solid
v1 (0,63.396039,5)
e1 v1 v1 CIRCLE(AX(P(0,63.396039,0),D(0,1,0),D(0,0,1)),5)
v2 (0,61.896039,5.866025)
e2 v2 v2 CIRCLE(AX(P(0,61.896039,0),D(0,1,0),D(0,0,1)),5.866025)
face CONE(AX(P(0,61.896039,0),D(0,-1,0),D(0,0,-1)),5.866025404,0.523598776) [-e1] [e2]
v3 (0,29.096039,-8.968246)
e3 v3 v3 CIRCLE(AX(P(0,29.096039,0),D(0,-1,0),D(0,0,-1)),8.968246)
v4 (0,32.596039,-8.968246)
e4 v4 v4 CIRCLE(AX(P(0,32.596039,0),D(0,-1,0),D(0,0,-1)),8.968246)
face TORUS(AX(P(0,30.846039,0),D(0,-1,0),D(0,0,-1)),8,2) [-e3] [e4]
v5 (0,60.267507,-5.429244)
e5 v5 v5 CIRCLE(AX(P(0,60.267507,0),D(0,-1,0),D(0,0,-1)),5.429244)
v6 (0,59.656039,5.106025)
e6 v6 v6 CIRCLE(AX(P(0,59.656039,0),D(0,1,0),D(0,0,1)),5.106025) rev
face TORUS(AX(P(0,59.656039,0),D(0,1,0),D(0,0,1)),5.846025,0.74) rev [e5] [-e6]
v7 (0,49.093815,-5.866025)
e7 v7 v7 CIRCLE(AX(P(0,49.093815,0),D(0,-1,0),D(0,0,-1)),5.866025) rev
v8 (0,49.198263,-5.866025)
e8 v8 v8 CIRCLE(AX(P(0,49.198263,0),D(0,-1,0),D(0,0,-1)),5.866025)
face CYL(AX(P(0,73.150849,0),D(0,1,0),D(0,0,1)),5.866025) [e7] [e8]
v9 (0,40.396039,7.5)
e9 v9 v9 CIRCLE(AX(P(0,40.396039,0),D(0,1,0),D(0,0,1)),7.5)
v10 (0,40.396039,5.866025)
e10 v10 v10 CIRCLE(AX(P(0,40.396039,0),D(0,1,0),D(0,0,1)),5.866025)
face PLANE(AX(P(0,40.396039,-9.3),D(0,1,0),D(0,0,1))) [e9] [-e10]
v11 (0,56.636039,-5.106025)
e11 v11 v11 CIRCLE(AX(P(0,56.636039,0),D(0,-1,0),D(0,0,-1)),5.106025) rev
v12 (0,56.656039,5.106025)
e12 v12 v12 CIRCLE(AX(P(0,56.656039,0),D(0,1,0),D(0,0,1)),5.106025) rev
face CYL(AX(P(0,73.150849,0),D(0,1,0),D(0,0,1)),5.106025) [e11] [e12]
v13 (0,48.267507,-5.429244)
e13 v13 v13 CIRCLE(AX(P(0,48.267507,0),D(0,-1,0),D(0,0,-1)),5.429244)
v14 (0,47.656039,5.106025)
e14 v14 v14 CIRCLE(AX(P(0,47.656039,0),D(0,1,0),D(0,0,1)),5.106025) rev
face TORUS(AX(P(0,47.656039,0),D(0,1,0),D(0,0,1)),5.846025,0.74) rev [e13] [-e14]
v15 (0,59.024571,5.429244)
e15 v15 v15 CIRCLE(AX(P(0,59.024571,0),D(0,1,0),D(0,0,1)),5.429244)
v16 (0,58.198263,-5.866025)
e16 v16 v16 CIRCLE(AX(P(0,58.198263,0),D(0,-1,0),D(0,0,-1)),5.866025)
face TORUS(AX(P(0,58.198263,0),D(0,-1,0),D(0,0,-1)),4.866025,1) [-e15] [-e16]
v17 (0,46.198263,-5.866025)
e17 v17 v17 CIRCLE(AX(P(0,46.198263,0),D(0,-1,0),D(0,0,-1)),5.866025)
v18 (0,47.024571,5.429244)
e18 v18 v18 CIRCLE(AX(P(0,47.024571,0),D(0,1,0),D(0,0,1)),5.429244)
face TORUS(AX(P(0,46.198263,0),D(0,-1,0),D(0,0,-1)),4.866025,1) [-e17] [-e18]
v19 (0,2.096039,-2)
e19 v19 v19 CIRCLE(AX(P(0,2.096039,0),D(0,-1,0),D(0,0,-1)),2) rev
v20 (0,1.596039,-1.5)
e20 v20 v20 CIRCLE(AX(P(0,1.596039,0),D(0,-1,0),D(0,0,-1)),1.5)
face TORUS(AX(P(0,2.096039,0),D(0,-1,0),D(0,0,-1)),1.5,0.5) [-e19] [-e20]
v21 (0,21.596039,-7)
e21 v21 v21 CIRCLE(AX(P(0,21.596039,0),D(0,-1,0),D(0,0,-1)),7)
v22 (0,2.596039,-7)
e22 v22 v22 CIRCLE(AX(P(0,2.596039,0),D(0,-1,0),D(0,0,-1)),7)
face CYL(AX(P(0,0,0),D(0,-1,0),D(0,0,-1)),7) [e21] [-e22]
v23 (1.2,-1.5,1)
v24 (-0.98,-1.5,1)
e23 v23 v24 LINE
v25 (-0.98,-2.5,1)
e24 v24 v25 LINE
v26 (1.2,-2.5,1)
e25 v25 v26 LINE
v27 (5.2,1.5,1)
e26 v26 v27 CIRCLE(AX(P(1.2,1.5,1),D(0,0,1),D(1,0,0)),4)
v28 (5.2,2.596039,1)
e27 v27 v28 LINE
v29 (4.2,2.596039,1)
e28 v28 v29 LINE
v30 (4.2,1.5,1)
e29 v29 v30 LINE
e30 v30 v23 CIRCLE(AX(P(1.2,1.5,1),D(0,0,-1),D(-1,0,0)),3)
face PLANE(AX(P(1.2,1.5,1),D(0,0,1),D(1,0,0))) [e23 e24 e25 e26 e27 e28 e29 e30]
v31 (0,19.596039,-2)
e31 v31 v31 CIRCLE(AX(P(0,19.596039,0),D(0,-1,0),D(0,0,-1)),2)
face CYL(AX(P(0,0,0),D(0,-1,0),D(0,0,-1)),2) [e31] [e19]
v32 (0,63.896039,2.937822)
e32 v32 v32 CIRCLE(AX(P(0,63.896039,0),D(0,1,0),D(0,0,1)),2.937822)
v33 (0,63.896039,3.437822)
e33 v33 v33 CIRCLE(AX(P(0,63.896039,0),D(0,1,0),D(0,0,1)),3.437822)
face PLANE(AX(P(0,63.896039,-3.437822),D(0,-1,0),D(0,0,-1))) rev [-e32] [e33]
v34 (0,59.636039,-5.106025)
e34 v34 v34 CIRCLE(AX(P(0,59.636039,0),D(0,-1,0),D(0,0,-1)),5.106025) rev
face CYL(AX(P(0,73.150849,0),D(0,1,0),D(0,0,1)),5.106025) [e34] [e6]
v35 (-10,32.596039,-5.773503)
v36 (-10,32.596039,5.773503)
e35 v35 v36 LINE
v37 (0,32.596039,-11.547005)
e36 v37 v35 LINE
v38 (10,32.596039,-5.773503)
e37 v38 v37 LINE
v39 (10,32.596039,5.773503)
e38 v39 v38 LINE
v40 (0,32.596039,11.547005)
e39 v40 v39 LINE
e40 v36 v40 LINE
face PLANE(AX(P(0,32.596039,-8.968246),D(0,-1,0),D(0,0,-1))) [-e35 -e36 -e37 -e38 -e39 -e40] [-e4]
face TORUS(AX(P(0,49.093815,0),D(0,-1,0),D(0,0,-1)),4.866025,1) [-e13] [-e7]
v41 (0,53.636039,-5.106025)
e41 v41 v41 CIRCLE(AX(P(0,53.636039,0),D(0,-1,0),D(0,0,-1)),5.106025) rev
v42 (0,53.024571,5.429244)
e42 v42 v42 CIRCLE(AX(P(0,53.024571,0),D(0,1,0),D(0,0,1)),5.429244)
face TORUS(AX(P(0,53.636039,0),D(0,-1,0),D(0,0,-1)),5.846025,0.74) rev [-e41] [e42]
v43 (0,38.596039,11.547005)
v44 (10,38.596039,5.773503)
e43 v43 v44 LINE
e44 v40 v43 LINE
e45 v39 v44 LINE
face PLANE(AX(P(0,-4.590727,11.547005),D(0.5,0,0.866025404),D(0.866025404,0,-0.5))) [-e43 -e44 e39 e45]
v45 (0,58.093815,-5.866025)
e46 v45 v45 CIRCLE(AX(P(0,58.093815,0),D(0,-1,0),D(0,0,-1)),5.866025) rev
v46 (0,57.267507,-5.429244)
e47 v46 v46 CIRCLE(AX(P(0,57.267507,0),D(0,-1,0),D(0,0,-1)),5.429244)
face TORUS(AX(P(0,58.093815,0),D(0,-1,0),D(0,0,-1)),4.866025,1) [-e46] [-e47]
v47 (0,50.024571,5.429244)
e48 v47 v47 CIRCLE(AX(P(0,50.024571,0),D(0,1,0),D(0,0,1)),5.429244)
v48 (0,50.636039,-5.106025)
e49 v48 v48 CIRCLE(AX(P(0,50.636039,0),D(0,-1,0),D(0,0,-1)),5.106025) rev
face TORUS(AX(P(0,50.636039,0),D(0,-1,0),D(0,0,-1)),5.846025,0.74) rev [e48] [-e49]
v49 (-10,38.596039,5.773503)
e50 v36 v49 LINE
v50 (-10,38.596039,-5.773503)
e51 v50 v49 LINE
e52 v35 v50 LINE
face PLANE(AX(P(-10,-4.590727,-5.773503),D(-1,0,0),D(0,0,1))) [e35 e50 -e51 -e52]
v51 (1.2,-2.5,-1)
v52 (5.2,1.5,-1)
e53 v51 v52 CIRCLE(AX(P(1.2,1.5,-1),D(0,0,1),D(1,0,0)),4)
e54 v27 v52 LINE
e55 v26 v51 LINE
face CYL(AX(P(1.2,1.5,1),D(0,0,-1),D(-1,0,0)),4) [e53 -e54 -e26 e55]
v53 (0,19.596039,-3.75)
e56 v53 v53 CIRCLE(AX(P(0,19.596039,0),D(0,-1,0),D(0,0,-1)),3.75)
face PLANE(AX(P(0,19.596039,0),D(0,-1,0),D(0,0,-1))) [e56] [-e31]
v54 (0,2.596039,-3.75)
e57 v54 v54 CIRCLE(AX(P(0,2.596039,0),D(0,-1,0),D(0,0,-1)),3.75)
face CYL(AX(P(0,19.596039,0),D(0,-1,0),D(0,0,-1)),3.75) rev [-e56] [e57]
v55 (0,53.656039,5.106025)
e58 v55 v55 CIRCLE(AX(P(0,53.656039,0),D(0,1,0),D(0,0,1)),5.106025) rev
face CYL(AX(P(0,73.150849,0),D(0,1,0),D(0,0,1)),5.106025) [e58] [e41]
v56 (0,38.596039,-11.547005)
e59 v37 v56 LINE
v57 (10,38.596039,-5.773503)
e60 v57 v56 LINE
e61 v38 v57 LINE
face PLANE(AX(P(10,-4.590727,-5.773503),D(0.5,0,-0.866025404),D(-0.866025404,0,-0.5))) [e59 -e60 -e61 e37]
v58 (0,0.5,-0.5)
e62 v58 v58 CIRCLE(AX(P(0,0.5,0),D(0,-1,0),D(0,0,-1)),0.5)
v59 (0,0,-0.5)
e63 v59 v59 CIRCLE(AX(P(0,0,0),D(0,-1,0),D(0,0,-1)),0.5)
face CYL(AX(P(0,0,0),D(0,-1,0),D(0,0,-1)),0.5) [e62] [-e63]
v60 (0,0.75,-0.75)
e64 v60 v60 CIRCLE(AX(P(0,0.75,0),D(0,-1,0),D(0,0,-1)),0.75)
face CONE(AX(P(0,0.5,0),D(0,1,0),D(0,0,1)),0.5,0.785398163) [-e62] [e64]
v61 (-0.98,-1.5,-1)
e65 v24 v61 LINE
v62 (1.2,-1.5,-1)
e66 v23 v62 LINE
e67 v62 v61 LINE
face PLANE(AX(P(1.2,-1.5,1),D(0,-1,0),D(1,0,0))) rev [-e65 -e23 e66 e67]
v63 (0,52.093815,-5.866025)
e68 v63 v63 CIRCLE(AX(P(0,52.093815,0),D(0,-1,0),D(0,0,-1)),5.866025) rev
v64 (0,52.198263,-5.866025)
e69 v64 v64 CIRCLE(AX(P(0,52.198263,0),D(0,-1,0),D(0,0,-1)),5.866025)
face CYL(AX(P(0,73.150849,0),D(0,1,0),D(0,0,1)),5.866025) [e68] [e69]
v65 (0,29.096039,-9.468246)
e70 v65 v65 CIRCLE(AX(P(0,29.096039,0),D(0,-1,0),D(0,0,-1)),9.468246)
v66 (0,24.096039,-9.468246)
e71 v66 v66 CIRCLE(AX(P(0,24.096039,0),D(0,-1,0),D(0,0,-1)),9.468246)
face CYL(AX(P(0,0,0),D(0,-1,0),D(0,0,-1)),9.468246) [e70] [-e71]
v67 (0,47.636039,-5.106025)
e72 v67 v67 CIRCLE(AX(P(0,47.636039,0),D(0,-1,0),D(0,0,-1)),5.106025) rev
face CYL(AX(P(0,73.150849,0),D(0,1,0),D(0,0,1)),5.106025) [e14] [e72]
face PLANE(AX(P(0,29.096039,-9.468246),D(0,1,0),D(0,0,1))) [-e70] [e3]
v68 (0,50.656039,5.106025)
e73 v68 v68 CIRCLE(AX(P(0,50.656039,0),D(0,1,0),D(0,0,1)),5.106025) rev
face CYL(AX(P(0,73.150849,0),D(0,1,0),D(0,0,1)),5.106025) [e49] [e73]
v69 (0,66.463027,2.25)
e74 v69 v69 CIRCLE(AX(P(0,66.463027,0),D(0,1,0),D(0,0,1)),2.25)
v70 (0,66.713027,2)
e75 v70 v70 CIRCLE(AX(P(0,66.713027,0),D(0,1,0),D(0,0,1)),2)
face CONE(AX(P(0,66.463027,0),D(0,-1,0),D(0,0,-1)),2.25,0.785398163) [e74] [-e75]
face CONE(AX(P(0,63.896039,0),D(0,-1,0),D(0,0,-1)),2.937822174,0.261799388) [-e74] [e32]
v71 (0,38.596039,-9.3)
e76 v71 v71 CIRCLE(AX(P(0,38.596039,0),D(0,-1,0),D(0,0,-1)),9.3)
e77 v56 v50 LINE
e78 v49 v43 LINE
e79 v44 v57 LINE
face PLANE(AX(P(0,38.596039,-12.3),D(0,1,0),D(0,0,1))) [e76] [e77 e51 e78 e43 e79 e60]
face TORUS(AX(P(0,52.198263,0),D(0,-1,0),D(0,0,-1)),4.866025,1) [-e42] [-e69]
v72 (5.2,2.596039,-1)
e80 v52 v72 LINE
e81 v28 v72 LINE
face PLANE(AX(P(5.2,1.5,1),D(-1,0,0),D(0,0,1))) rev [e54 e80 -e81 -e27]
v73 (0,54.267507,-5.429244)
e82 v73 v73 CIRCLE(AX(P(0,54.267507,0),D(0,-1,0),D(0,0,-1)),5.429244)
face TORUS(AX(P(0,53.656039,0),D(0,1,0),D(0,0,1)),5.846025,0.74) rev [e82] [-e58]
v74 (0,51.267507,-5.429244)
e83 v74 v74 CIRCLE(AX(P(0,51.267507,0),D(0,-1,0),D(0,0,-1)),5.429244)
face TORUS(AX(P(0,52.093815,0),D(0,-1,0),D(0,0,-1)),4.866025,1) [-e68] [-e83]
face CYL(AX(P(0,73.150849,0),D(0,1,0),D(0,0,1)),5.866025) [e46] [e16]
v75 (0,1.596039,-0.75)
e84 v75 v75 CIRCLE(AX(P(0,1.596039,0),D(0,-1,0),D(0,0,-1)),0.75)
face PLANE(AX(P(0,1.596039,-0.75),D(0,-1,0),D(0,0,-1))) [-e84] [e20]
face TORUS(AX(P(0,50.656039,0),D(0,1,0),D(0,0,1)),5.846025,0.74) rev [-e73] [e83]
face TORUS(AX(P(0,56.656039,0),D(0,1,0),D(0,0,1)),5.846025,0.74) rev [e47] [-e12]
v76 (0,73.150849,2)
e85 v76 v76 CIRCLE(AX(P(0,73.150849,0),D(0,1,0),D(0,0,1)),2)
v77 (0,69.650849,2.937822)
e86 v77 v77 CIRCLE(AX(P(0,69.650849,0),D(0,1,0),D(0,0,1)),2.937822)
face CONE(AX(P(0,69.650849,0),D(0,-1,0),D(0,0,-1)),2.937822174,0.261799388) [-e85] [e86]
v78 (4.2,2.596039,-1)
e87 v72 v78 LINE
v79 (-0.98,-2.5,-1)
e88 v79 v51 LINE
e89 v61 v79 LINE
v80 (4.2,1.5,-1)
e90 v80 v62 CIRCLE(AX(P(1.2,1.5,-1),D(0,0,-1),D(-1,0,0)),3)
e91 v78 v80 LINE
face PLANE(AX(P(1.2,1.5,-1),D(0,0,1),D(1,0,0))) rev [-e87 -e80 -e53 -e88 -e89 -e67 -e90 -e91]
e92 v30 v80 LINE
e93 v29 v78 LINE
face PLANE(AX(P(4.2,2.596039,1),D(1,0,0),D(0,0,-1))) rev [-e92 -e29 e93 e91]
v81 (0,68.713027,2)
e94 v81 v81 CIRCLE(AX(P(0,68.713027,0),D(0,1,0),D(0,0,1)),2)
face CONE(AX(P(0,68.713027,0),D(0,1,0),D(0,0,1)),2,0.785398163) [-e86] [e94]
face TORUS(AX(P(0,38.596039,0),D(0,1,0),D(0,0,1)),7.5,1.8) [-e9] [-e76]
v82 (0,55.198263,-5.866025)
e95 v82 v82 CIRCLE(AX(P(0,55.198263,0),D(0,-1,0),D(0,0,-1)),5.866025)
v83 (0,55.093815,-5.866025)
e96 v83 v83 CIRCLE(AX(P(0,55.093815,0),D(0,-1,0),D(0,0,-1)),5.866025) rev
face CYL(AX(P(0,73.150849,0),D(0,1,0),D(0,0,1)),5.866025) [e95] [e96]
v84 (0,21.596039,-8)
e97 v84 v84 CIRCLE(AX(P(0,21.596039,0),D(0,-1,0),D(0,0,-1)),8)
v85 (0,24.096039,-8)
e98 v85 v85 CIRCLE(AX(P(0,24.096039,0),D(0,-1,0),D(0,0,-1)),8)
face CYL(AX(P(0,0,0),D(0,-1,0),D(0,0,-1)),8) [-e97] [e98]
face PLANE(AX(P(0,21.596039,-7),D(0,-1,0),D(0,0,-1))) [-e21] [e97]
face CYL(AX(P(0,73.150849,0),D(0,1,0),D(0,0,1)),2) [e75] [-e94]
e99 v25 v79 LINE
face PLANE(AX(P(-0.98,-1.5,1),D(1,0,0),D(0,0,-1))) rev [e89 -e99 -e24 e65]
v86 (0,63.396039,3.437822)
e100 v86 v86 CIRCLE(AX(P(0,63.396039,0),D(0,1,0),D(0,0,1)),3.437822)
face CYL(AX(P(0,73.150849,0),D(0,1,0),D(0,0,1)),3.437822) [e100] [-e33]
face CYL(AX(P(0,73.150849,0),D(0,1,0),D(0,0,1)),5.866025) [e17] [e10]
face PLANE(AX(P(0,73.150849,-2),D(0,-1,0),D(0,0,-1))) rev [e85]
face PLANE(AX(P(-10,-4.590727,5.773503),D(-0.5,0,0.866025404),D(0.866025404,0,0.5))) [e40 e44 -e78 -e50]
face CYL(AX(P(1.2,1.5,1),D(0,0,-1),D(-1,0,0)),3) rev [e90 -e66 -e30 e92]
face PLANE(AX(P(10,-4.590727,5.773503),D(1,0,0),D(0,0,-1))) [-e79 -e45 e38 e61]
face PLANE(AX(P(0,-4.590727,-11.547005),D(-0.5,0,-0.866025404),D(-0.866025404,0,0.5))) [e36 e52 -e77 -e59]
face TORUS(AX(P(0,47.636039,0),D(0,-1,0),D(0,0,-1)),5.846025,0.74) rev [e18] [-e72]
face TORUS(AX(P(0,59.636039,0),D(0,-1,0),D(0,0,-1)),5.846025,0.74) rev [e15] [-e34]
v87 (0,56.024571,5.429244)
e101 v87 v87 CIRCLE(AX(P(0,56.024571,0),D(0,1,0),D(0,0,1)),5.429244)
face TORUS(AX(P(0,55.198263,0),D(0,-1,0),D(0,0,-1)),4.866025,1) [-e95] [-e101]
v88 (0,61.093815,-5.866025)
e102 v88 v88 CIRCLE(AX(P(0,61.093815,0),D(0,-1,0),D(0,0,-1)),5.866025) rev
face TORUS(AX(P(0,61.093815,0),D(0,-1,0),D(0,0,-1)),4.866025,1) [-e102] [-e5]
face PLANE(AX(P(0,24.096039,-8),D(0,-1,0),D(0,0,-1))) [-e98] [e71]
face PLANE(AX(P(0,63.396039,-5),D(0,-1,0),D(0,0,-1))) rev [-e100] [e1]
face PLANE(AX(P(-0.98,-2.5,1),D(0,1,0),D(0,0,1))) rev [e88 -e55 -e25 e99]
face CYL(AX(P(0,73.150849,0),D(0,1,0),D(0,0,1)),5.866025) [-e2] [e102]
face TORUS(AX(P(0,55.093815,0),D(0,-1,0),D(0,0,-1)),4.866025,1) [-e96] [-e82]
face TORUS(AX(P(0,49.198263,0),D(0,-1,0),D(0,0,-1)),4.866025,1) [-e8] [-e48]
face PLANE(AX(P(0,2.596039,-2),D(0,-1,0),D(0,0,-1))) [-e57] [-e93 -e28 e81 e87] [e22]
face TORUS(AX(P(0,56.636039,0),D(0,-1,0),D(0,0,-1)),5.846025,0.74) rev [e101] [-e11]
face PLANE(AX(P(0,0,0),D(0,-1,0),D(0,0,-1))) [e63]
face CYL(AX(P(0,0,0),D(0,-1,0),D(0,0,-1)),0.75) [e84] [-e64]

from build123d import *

# Parameters (mm, degrees)
CUT_EXTRUDE1_START  = -17
SKETCH2_R           = 3.75
SKETCH2_R_2         = 2
CUT_EXTRUDE1_DEPTH  = 17
FILLET1_R           = 0.5
FILLET2_R           = 0.74
FILLET3_R           = 1
FILLET4_R           = 1.8
BOSS_EXTRUDE1_DEPTH = 1
SKETCH6_OUTSIDE_W   = 43.254
SKETCH6_OUTSIDE_H   = 43.254
CUT_EXTRUDE2_DEPTH  = 6


with BuildPart() as part:
    # Sketch1 → Revolve1 (revolve)
    with BuildSketch(Plane(origin=(0, 0, 0), x_dir=(0, 0, -1), z_dir=(1, 0, 0))):
        with BuildLine():
            Line((0, 0), (0.5, 0))
            Line((0.5, 0), (0.5, 0.5))
            Line((0.5, 0.5), (0.75, 0.75))
            Line((0.75, 0.75), (0.75, 1.59603925))
            Line((0.75, 1.59603925), (2, 1.59603925))
            Line((2, 1.59603925), (2, 2.59603925))
            Line((2, 2.59603925), (7, 2.59603925))
            Line((7, 2.59603925), (7, 21.59603925))
            Line((7, 21.59603925), (8, 21.59603925))
            Line((8, 21.59603925), (8, 24.09603925))
            Line((8, 24.09603925), (9.468245837, 24.09603925))
            Line((9.468245837, 24.09603925), (9.468245837, 29.09603925))
            Line((9.468245837, 29.09603925), (8.968245837, 29.09603925))
            ThreePointArc((8.968245837, 29.09603925), (10, 30.84603925), (8.968245837, 32.59603925))
            Line((8.968245837, 32.59603925), (12.3, 32.59603925))
            Line((12.3, 32.59603925), (12.3, 38.59603925))
            Line((12.3, 38.59603925), (9.3, 38.59603925))
            Line((9.3, 38.59603925), (9.3, 40.39603925))
            Line((9.3, 40.39603925), (0, 40.39603925))
            Line((0, 40.39603925), (0, 0))
        make_face()
    revolve(axis=Axis((0, 0, 0), (0, 1, 0)))

    # Sketch2 → Cut-Extrude1 (cut)
    with BuildSketch(Plane.XZ.offset(-2.59603925).offset(CUT_EXTRUDE1_START)):
        with Locations(Location((0, 0, 0), (0, 0, 270))):
            Circle(SKETCH2_R)
        with Locations(Location((0, 0, 0), (0, 0, 270))):
            Circle(SKETCH2_R_2, mode=Mode.SUBTRACT)
    extrude(amount=CUT_EXTRUDE1_DEPTH, mode=Mode.SUBTRACT)

    # Fillet1
    fillet1_edges = [part.edges().sort_by_distance(p)[0] for p in [
        (0, 1.59603925, 2),
    ]]
    fillet(fillet1_edges, radius=FILLET1_R)

    # Sketch3 → Revolve2 (revolve)
    with BuildSketch(Plane(origin=(0, 0, 0), x_dir=(0, 0, -1), z_dir=(1, 0, 0)), mode=Mode.PRIVATE) as revolve2_sk:
        Polygon((0, 40.39603925), (5.866025404, 40.39603925), (5.866025404, 46.89603925), (5.106025404, 46.89603925), (5.106025404, 48.39603925), (5.866025404, 48.39603925), (5.866025404, 49.89603925), (5.106025404, 49.89603925), (5.106025404, 51.39603925), (5.866025404, 51.39603925), (5.866025404, 52.89603925), (5.106025404, 52.89603925), (5.106025404, 54.39603925), (5.866025404, 54.39603925), (5.866025404, 55.89603925), (5.106025404, 55.89603925), (5.106025404, 57.39603925), (5.866025404, 57.39603925), (5.866025404, 58.89603925), (5.106025404, 58.89603925), (5.106025404, 60.39603925), (5.866025404, 60.39603925), (5.866025404, 61.89603925), (5, 63.39603925), (3.437822174, 63.39603925), (3.437822174, 63.89603925), (2.937822174, 63.89603925), (2.25, 66.463026548), (2, 66.713026548), (2, 68.713026548), (2.937822174, 69.650848722), (2, 73.150848722), (0, 73.150848722), align=None)
    revolve(revolve2_sk.sketch.rotate(Axis((0, 73.150848722, 0), (0, -1, 0)), 180), axis=Axis((0, 73.150848722, 0), (0, -1, 0)))

    # Fillet2
    fillet2_edges = [part.edges().sort_by_distance(p)[0] for p in [
        (0, 46.89603925, -5.106025404),
        (0, 48.39603925, -5.106025404),
        (0, 49.89603925, -5.106025404),
        (0, 51.39603925, -5.106025404),
        (0, 52.89603925, -5.106025404),
        (0, 54.39603925, -5.106025404),
        (0, 55.89603925, -5.106025404),
        (0, 57.39603925, -5.106025404),
        (0, 58.89603925, -5.106025404),
        (0, 60.39603925, -5.106025404),
    ]]
    fillet(fillet2_edges, radius=FILLET2_R)

    # Fillet3
    fillet3_edges = [part.edges().sort_by_distance(p)[0] for p in [
        (0, 46.89603925, -5.866025404),
        (0, 49.89603925, -5.866025404),
        (0, 51.39603925, -5.866025404),
        (0, 52.89603925, -5.866025404),
        (0, 54.39603925, -5.866025404),
        (0, 55.89603925, -5.866025404),
        (0, 58.89603925, -5.866025404),
        (0, 57.39603925, -5.866025404),
        (0, 60.39603925, -5.866025404),
        (0, 48.39603925, -5.866025404),
    ]]
    fillet(fillet3_edges, radius=FILLET3_R)

    # Fillet4
    fillet4_edges = [part.edges().sort_by_distance(p)[0] for p in [
        (0, 40.39603925, 9.3),
    ]]
    fillet(fillet4_edges, radius=FILLET4_R - 0.0001)  # a hair under: the kernel refuses the full size

    # Sketch5 → Boss-Extrude1 (add, symmetric)
    with BuildSketch(Plane.XY):
        with BuildLine():
            Line((4.2, 2.59603925), (4.2, 1.5))
            ThreePointArc((4.2, 1.5), (3.321320344, -0.621320344), (1.2, -1.5))
            Line((1.2, -1.5), (-0.98, -1.5))
            Line((-0.98, -1.5), (-0.98, -2.5))
            Line((-0.98, -2.5), (1.2, -2.5))
            ThreePointArc((1.2, -2.5), (4.028427125, -1.328427125), (5.2, 1.5))
            Line((5.2, 1.5), (5.2, 2.59603925))
            Line((5.2, 2.59603925), (4.2, 2.59603925))
        make_face()
    extrude(amount=BOSS_EXTRUDE1_DEPTH, both=True)

    # Sketch6 outside → Cut-Extrude2 (cut)
    with BuildSketch(Plane(origin=(0, 38.59603925, 0), x_dir=(1, 0, 0), z_dir=(0, 1, 0))):
        Rectangle(SKETCH6_OUTSIDE_W, SKETCH6_OUTSIDE_H)
        Polygon((0, -11.547005384), (10, -5.773502692), (10, 5.773502692), (0, 11.547005384), (-10, 5.773502692), (-10, -5.773502692), align=None, mode=Mode.SUBTRACT)
    extrude(amount=-CUT_EXTRUDE2_DEPTH, mode=Mode.SUBTRACT)


solid = part.part
